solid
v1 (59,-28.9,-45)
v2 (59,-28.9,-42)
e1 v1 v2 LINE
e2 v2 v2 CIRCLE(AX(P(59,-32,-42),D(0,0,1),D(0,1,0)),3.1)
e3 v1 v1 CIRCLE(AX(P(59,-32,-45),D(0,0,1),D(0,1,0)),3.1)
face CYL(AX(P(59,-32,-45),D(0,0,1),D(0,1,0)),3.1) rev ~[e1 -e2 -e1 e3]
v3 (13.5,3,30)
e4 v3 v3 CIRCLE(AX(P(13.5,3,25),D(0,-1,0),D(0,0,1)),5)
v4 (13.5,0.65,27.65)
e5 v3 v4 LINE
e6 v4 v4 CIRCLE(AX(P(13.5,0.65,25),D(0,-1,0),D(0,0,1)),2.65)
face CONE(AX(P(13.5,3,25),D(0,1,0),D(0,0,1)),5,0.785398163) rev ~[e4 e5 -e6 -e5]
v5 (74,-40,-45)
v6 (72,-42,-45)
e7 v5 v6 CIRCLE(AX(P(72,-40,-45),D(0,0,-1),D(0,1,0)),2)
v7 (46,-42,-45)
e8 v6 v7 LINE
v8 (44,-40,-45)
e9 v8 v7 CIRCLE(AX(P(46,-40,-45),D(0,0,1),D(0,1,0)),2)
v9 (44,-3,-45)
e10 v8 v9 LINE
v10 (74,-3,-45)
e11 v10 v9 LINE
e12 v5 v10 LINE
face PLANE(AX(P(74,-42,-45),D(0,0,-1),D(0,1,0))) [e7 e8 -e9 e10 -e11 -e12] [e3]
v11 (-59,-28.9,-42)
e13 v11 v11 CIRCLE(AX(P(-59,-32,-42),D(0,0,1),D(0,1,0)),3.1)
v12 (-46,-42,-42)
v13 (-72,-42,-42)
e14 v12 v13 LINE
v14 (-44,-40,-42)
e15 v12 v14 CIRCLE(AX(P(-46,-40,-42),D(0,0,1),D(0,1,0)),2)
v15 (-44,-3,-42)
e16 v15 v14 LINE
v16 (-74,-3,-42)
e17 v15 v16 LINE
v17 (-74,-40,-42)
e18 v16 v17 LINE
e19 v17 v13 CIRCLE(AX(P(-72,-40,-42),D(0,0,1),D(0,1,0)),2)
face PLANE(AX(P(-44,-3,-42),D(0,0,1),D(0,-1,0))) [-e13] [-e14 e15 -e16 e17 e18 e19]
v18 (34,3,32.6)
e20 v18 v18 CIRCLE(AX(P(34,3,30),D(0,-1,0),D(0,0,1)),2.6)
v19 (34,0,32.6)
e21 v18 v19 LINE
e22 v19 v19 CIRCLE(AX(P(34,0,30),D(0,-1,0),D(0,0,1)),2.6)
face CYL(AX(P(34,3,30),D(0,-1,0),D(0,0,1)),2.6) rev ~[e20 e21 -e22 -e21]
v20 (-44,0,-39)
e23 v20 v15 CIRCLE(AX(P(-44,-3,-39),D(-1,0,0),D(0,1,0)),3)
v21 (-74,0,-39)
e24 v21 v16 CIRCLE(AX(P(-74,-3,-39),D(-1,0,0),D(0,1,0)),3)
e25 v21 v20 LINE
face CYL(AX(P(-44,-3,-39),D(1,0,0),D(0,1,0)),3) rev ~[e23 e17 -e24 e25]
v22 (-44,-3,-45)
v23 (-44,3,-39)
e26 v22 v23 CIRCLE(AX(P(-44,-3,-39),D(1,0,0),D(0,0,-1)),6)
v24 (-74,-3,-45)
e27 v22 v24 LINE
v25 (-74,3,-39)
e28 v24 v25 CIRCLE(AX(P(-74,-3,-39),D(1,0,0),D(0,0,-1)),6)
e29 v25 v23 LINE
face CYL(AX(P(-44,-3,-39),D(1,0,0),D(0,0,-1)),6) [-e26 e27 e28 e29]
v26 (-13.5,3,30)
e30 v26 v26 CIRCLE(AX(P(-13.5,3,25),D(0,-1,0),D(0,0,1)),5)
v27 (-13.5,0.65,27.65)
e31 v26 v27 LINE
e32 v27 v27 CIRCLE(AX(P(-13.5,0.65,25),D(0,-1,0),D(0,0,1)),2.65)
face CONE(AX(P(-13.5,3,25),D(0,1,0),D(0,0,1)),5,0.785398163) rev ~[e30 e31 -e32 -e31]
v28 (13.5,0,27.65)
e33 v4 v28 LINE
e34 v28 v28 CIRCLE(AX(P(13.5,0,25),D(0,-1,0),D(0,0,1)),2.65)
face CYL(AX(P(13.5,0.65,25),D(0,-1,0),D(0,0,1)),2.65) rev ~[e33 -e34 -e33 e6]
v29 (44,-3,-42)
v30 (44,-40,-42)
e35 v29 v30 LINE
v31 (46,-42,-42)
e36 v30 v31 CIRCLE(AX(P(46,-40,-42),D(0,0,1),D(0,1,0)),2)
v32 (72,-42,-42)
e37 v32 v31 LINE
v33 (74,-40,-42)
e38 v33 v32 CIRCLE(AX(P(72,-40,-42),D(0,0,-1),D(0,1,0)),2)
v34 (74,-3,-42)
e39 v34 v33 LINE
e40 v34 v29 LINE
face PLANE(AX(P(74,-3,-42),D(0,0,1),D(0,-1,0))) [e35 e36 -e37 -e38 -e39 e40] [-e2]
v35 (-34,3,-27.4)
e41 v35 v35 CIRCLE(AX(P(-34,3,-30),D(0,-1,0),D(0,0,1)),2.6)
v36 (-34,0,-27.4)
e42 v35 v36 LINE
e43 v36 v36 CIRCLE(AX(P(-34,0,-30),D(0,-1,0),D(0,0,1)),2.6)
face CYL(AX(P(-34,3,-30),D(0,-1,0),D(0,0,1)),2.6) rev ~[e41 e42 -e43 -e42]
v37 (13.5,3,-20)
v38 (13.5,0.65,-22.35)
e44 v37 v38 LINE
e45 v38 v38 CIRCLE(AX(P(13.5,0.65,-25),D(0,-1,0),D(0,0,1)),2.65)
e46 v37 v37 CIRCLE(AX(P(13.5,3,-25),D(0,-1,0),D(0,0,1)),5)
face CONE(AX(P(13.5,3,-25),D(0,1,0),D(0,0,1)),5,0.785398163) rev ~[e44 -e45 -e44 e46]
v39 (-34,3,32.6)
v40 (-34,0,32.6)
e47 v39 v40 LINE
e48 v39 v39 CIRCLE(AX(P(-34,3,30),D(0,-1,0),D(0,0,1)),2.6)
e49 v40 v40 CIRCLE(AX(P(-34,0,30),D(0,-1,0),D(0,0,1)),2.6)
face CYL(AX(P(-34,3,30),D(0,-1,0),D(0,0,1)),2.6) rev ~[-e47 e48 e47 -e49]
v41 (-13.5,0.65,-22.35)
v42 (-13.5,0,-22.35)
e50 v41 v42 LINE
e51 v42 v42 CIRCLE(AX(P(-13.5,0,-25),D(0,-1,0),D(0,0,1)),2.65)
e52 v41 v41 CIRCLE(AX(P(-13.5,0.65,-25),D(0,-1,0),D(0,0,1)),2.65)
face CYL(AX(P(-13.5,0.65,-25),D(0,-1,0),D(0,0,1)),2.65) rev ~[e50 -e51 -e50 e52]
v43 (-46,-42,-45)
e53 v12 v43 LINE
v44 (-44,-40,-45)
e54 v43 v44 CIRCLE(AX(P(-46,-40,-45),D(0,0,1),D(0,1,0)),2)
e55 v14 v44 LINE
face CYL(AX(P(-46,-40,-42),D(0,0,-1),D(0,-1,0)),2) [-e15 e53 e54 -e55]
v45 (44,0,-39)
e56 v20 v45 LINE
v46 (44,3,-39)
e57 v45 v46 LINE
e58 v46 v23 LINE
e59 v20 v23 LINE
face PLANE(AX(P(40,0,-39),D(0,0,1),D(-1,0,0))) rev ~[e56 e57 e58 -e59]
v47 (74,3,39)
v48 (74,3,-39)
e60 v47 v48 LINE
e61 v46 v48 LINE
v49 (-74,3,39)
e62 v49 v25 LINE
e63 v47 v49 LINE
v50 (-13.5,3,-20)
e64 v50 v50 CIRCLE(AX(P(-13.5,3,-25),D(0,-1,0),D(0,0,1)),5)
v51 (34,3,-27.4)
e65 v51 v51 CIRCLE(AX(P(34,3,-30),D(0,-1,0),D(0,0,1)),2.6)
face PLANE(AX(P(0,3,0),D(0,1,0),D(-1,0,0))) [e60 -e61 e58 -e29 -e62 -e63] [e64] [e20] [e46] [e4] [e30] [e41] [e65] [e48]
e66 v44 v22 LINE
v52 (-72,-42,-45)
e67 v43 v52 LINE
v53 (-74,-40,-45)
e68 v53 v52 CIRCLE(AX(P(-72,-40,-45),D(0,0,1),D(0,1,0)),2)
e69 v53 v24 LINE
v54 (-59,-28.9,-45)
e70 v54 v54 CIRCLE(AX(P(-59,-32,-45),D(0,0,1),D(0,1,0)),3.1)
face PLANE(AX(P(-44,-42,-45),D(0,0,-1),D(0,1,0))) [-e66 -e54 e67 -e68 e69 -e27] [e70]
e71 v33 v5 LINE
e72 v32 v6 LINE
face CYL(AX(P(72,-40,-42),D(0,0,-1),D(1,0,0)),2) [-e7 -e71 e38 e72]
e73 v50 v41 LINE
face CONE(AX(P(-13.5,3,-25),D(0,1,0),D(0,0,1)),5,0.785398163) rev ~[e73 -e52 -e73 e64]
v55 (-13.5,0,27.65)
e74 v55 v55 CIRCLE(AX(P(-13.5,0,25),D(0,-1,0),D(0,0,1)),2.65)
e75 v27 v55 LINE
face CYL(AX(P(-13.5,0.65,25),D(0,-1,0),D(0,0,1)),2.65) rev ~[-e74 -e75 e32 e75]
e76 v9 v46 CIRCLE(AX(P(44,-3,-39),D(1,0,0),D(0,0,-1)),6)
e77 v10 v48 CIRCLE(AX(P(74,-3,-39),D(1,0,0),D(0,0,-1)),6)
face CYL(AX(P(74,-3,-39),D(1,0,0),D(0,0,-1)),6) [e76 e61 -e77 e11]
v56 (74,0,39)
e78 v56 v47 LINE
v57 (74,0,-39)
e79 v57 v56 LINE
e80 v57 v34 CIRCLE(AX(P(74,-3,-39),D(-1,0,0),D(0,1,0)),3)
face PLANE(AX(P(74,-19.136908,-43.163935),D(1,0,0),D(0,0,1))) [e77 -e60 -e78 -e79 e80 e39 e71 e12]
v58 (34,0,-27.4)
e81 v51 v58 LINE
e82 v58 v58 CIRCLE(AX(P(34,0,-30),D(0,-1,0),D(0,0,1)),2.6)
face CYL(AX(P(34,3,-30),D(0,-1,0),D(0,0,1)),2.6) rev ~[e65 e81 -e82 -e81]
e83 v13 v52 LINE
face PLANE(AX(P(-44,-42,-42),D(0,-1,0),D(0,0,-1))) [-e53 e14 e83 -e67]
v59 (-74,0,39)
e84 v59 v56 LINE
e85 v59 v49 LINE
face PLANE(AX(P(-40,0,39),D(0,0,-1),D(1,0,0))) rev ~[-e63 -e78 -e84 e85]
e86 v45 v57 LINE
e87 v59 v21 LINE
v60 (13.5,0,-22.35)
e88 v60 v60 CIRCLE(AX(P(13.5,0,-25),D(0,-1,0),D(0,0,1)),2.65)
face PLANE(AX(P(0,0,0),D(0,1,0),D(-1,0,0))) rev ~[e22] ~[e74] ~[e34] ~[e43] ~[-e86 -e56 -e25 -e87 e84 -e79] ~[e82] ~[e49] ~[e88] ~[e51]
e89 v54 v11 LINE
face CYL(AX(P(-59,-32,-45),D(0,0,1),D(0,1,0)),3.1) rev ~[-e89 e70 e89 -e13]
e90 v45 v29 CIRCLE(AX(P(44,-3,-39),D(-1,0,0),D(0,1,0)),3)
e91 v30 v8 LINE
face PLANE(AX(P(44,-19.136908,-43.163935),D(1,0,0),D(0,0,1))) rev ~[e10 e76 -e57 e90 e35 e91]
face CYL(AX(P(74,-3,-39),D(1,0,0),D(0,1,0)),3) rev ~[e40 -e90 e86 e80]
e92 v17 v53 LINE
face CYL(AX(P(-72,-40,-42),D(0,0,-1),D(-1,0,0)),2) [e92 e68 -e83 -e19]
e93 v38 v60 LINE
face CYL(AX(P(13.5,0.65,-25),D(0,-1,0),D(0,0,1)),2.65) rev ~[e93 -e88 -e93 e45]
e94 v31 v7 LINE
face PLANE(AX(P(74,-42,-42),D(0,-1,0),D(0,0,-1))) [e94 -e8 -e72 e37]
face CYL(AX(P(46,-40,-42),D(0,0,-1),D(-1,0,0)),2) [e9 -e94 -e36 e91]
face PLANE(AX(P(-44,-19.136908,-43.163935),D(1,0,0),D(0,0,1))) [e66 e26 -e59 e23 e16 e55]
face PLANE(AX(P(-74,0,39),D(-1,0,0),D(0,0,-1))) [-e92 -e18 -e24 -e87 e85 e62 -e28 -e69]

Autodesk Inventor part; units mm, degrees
ref_plane "YZ Plane" through (0, 0, 0) normal (1, 0, 0) x (0, 1, 0)
ref_plane "XZ Plane" through (0, 0, 0) normal (0, 1, 0) x (-1, 0, 0)
ref_plane "XY Plane" through (0, 0, 0) normal (0, 0, 1) x (1, 0, 0)
sketch "スケッチ1" plane through (0, 0, 0) normal (0, 1, 0) x (-1, 0, 0)
  line L0 (-40, -39) -> (40, -39)
  line L1 (40, -39) -> (40, 39)
  line L2 (40, 39) -> (-40, 39)
  line L3 (-40, 39) -> (-40, -39)
  line L4 (-40, -39) -> (40, 39) construction
  line L5 (40, -39) -> (-40, 39) construction
  point P0 (0, 0)
  dimension "d0" = 80
  dimension "d1" = 78
extrude "押し出し1" add sketch "スケッチ1" along normal blind 3
sketch "スケッチ2" plane through (0, 3, 0) normal (0, 1, 0) x (1, 0, 0)
  line L0 (34, 30) -> (-34, 30)
  line L1 (-34, 30) -> (-34, -30)
  line L2 (-34, -30) -> (34, -30)
  line L3 (34, -30) -> (34, 30)
  line L4 (34, 30) -> (-34, -30) construction
  line L5 (-34, 30) -> (34, -30) construction
  point P0 (0, 0)
  dimension "d4" = 68
  dimension "d5" = 60
hole "穴1" at (-34, 3, 30) at (34, 3, 30) at (34, 3, -30) at (-34, 3, -30) direction (0, -1, 0) diameter 5.2 depth 8 tip angle 118
sketch "スケッチ3" plane through (0, 3, 0) normal (0, 1, 0) x (1, 0, 0)
  line L0 (13.5, 25) -> (-13.5, 25)
  line L1 (-13.5, 25) -> (-13.5, -25)
  line L2 (-13.5, -25) -> (13.5, -25)
  line L3 (13.5, -25) -> (13.5, 25)
  line L4 (13.5, 25) -> (-13.5, -25) construction
  line L5 (-13.5, 25) -> (13.5, -25) construction
  point P0 (0, 0)
  dimension "d13" = 27
  dimension "d14" = 50
hole "穴2" at (-13.5, 3, 25) at (13.5, 3, 25) at (13.5, 3, -25) at (-13.5, 3, -25) direction (0, -1, 0) diameter 5.3 depth 8 tip angle 118 countersink diameter 10 countersink angle 90
sketch "スケッチ5" plane through (0, 0, 0) normal (0, -1, 0) x (1, 0, 0)
  line L0 (74, 39) -> (-74, 39)
  line L1 (-74, 39) -> (-74, -39)
  line L2 (-74, -39) -> (74, -39)
  line L3 (74, -39) -> (74, 39)
  circle A0 centre (13.5, -25) radius 2.65 projected
  circle A1 centre (13.5, -25) radius 2.65 projected
  circle A2 centre (-13.5, 25) radius 2.65 projected
  circle A3 centre (13.5, 25) radius 2.65 projected
  circle A4 centre (-13.5, -25) radius 2.65 projected
  circle A5 centre (34, -30) radius 2.6 projected
  circle A6 centre (-34, 30) radius 2.6 projected
  circle A7 centre (34, 30) radius 2.6 projected
  circle A8 centre (-34, -30) radius 2.6 projected
  line L4 (-40, -39) -> (-40, 39) projected
  line L5 (40, -39) -> (-40, -39) projected
  line L6 (40, 39) -> (40, -39) projected
  line L7 (-40, 39) -> (40, 39) projected
  point P0 (0, 0)
  point P1 (-40, 39)
  dimension "d28" = 40
  dimension "d29" = 40
extrude "押し出し3" add sketch "スケッチ5" against normal up to surface (3 mm away) contours L3 L2 L6 L0 | L4 L2 L1 L0
sketch "スケッチ6" plane through (0, 0, 0) normal (0, -1, 0) x (1, 0, 0)
  circle A0 centre (13.5, -25) radius 2.65 projected
  circle A1 centre (-13.5, 25) radius 2.65 projected
  circle A2 centre (13.5, 25) radius 2.65 projected
  circle A3 centre (-13.5, -25) radius 2.65 projected
  circle A4 centre (34, -30) radius 2.6 projected
  circle A5 centre (-34, 30) radius 2.6 projected
  circle A6 centre (34, 30) radius 2.6 projected
  circle A7 centre (-34, -30) radius 2.6 projected
  line L0 (-74, -39) -> (74, -39) projected
  line L1 (74, -39) -> (74, 39) projected
  line L2 (74, 39) -> (-74, 39) projected
  line L3 (-74, 39) -> (-74, -39) projected
  line L4 (74, -39) -> (44, -39)
  line L5 (44, -39) -> (44, -42)
  line L6 (44, -42) -> (74, -42)
  line L7 (74, -42) -> (74, -39)
  line L8 (-74, 39) -> (-74, -39) projected
  line L9 (-74, -39) -> (-44, -39)
  line L10 (-44, -39) -> (-44, -42)
  line L11 (-44, -42) -> (-74, -42)
  line L12 (-74, -42) -> (-74, -39)
  line L13 (44, -42) -> (-44, -42)
  line L14 (-44, -42) -> (-44, -39)
  line L15 (-44, -39) -> (44, -39)
  line L16 (44, -39) -> (44, -42)
  point P0 (0, 0)
  dimension "d33" = 30
  dimension "d34" = 30
  dimension "d49" = 3
extrude "押し出し5" add sketch "スケッチ6" against normal up to surface (3 mm away) contours L0 L10 L11 L12 | L0 L7 L6 L5
sketch "スケッチ8" plane through (74, 0, -42) normal (0, 0, -1) x (-1, 0, 0)
  line L0 (30, 0) -> (0, 0)
  line L1 (0, 0) -> (0, -42)
  line L2 (0, -42) -> (30, -42)
  line L3 (30, -42) -> (30, 0)
edge flange "フランジ2" height 45 angle 90 thickness 3 bend radius 3 thickness toward (0, 0, -1) relief straight relief width 3 relief depth 1.5 corner gap 3 corner form 0 edges at (59, 0, -42) (-59, 0, -42) wall of the first edge with corners at (44, 0, -42) (74, 0, -42) (74, -42, -42) (44, -42, -42)
bend "曲げ2"
corner "コーナー2"
sketch "スケッチ9" plane through (-44, -42, -45) normal (0, 0, -1) x (-1, 0, 0)
  line L0 (30, 39) -> (0, 39) projected
  line L1 (0, 0) -> (0, 39) projected
  line L2 (30, 0) -> (0, 0) projected
  line L3 (30, 39) -> (30, 0) projected
  line L4 (-88, 39) -> (-118, 39) projected
  line L5 (-118, 0) -> (-118, 39) projected
  line L6 (-88, 0) -> (-118, 0) projected
  line L7 (-88, 39) -> (-88, 0) projected
  point P0 (-44, 42)
  point P1 (15, 10)
  point P2 (-103, 10)
  dimension "d62" = 10
  dimension "d63" = 15
  dimension "d64" = 15
hole "穴3" at (-59, -32, -45) at (59, -32, -45) direction (0, 0, 1) diameter 6.2 depth 3 tip angle 118
fillet "フィレット3" radius 2 4 edges at (-74, -42, -43.5) (-44, -42, -43.5) (44, -42, -43.5) (74, -42, -43.5)
equation "\"d28\" = d29"
equation "\"d70\" = Thickness"
equation "\"d38\" = Thickness"
equation "\"d52\" = BendReliefWidth"
equation "\"d53\" = BendReliefDepth"
equation "\"d54\" = MinimumRemnant"
equation "\"d55\" = TransitionRadius"
equation "\"d58\" = BendRadius"
equation "\"d59\" = CornerReliefSize"
equation "\"d60\" = GapSize"
equation "\"d61\" = JacobiRadiusSize"
equation "\"BendRadius\" = Thickness"
equation "\"BendReliefWidth\" = Thickness"
equation "\"BendReliefDepth\" = 0.5 * Thickness"
equation "\"CornerReliefSize\" = 4 * Thickness"
equation "\"MinimumRemnant\" = 2 * Thickness"
equation "\"TransitionRadius\" = BendRadius"
equation "\"JacobiRadiusSize\" = Thickness"
equation "\"GapSize\" = Thickness"
equation "\"Thickness\" = 3"
properties part number "CCM_Mount_F"
